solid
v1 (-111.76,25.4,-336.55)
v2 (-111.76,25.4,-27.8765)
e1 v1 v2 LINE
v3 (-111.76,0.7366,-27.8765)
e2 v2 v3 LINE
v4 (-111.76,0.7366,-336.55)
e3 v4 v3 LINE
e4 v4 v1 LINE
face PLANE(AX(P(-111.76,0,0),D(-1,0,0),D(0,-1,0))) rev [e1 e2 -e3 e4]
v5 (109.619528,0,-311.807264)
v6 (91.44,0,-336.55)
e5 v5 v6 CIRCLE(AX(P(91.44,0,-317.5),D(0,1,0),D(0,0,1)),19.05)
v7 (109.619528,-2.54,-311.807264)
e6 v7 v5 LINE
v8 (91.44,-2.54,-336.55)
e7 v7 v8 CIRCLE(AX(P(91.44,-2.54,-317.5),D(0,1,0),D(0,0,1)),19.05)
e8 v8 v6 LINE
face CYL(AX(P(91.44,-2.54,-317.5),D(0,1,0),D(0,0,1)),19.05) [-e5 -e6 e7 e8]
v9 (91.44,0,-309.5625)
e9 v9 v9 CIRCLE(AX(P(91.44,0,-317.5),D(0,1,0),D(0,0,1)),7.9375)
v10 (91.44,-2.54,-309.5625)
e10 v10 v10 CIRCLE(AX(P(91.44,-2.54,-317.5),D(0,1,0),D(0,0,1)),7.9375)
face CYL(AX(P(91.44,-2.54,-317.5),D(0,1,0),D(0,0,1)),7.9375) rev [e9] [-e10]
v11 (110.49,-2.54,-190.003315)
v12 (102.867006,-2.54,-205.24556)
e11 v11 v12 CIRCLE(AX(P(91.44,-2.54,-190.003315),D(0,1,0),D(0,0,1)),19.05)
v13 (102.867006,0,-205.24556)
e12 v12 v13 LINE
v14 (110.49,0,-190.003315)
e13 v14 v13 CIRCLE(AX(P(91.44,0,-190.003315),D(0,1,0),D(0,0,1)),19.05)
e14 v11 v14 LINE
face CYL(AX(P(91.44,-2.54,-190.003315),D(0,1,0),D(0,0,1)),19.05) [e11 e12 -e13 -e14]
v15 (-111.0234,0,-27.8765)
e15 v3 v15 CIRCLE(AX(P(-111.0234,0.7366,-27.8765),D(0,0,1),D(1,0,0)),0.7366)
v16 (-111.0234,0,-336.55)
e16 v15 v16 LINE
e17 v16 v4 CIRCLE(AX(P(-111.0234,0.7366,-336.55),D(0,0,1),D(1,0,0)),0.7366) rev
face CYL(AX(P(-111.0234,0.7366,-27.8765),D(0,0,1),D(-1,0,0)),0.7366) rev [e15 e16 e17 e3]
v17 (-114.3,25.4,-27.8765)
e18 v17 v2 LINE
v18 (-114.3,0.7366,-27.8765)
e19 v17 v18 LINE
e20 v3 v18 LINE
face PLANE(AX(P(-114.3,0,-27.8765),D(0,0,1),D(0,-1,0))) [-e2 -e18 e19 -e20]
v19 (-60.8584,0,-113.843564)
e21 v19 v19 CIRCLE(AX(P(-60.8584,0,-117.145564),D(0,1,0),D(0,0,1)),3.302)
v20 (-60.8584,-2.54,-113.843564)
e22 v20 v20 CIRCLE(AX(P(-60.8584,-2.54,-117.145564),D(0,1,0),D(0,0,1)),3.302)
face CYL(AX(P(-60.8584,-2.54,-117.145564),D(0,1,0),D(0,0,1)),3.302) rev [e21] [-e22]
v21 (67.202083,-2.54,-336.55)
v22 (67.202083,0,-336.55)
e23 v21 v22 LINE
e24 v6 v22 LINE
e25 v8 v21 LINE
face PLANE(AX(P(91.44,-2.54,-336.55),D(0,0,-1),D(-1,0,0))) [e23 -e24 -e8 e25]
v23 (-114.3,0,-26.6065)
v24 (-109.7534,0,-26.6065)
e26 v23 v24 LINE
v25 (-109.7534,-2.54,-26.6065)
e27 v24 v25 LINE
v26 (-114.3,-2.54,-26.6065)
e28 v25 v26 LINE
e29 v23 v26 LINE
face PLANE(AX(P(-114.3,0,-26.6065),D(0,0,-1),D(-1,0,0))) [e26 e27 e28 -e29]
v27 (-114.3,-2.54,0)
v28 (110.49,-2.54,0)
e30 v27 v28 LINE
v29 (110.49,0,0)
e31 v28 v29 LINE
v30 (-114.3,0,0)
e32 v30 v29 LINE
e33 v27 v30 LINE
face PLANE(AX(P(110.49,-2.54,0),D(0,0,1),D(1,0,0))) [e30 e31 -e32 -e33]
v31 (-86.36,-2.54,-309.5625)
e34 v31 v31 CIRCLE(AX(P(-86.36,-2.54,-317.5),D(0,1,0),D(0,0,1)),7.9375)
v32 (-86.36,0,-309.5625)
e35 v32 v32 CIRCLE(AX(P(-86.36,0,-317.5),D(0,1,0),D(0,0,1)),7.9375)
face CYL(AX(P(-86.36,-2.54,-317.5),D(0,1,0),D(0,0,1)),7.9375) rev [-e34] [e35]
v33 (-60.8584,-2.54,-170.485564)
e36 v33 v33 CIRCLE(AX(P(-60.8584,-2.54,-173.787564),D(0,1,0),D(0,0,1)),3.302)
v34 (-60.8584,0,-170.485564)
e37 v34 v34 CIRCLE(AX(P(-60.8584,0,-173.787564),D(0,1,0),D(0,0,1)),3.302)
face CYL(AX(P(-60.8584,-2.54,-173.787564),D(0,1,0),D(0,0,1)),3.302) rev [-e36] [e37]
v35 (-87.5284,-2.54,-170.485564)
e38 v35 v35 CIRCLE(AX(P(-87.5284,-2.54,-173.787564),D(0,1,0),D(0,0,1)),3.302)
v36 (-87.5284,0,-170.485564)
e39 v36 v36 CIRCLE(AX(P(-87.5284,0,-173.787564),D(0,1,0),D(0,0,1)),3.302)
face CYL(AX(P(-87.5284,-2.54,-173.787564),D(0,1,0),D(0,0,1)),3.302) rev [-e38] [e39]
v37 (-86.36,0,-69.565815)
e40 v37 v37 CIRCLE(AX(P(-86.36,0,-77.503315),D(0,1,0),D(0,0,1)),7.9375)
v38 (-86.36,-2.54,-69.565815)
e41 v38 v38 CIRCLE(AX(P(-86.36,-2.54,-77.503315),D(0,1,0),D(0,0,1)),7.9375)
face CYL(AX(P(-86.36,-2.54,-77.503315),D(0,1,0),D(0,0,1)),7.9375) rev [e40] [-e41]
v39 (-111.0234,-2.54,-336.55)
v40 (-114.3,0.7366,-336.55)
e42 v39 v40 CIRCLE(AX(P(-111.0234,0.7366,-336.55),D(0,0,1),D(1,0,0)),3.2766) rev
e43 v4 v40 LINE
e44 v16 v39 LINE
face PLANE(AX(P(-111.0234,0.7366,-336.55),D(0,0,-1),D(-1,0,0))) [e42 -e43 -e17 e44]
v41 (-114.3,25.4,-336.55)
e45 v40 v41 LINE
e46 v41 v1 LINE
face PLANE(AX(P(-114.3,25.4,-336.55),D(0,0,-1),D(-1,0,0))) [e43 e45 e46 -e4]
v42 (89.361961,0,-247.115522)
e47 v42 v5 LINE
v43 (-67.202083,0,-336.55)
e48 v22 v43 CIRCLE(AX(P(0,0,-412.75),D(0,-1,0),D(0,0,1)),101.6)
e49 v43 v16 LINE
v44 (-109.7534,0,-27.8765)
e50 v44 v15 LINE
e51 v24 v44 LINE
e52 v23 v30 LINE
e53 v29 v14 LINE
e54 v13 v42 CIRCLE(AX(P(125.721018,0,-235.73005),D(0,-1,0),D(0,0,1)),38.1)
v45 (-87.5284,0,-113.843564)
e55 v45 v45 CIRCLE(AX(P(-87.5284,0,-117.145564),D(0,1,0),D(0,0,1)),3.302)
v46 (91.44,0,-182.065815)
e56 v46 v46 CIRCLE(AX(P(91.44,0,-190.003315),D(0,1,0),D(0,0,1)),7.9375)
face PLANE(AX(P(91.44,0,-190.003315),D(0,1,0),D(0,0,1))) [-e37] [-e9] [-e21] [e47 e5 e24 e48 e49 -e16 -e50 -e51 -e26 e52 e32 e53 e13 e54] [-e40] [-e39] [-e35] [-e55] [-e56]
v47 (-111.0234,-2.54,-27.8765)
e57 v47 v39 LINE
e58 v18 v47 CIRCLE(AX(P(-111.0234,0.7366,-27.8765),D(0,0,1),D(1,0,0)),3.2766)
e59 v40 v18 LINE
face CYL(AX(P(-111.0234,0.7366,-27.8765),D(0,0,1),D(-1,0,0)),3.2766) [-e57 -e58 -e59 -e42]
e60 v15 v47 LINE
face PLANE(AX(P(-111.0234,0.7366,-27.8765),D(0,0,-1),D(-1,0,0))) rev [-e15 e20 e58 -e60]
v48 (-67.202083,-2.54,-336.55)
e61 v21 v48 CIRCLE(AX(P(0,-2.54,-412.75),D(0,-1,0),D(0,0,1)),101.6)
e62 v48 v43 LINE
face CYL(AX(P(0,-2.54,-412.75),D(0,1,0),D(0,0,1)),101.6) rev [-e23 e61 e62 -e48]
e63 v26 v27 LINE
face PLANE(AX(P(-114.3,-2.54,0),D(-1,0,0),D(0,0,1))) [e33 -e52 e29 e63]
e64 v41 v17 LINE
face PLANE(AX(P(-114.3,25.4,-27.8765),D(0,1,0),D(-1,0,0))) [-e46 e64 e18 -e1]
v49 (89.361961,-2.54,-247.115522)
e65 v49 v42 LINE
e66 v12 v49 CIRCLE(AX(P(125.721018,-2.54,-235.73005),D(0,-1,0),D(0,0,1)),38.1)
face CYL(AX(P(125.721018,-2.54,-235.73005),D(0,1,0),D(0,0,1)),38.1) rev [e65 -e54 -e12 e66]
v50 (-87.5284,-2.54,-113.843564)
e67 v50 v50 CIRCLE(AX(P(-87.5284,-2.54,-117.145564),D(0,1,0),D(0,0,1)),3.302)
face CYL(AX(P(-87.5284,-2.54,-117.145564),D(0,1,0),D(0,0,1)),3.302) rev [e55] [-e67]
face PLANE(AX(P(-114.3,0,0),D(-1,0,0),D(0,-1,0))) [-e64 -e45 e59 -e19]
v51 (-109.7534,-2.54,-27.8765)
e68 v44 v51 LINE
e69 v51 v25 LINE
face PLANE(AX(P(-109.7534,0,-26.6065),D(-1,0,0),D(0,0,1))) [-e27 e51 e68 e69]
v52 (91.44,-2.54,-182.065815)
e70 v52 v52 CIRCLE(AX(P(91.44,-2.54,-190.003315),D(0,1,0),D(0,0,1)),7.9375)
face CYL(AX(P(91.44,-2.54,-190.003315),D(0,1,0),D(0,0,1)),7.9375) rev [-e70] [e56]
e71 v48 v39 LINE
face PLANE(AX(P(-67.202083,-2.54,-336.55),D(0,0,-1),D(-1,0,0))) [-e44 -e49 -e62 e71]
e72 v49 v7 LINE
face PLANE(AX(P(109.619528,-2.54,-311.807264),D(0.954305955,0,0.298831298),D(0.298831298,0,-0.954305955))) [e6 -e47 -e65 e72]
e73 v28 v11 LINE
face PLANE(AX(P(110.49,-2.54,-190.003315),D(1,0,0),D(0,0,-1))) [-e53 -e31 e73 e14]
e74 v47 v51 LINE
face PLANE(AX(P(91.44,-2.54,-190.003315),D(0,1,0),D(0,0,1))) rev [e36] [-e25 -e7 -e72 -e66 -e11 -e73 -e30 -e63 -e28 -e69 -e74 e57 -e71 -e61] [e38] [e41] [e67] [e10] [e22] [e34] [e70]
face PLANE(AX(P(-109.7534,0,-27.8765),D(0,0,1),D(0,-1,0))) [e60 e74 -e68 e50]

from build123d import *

# Parameters (mm, degrees)
SKETCH1_R                     = 7.9375
SKETCH1_R_2                   = 3.302
BASE_FLANGE1_DEPTH            = 2.54
EDGE_FLANGE1_STRIP_W          = 11.6332
EDGE_FLANGE1_STRIP_H          = 2.54
EDGE_FLANGE1_STRIP_CUT_DEPTH  = 308.6735
EDGE_FLANGE1_RELIEF_W         = 12.9032
EDGE_FLANGE1_RELIEF_H         = 1.27
EDGE_FLANGE1_RELIEF_CUT_DEPTH = 2.54
EDGE_FLANGE1_DEPTH            = 308.6735


# Sheet-metal steps are written as plain solids
with BuildPart() as part:
    # Sketch1 → Base-Flange1 (new body)
    with BuildSketch(Plane(origin=(0, 0, 0), x_dir=(1, 0, 0), z_dir=(0, 1, 0))):
        with BuildLine():
            Line((109.619528436, 311.807263764), (89.361961148, 247.115522342))
            ThreePointArc((89.361961148, 247.115522342), (89.460566801, 224.034337943), (102.867006006, 205.245559798))
            ThreePointArc((102.867006006, 205.245559798), (108.478001121, 198.524407286), (110.49, 190.003314763))
            Line((110.49, 190.003314763), (110.49, 0))
            Line((110.49, 0), (-114.3, 0))
            Line((-114.3, 0), (-114.3, 336.55))
            Line((-114.3, 336.55), (-67.202083301, 336.55))
            ThreePointArc((-67.202083301, 336.55), (0, 311.15), (67.202083301, 336.55))
            Line((67.202083301, 336.55), (91.44, 336.55))
            ThreePointArc((91.44, 336.55), (106.791695758, 328.779536221), (109.619528436, 311.807263764))
        make_face()
        with Locations(Location((-86.36, 317.5, 0), (0, 0, 270))):
            Circle(SKETCH1_R, mode=Mode.SUBTRACT)
        with Locations(Location((91.44, 317.5, 0), (0, 0, 270))):
            Circle(SKETCH1_R, mode=Mode.SUBTRACT)
        with Locations(Location((91.44, 190.003314763, 0), (0, 0, 270))):
            Circle(SKETCH1_R, mode=Mode.SUBTRACT)
        with Locations(Location((-86.36, 77.503314763, 0), (0, 0, 270))):
            Circle(SKETCH1_R, mode=Mode.SUBTRACT)
        with Locations(Location((-60.8584, 173.787563647, 0), (0, 0, 270))):
            Circle(SKETCH1_R_2, mode=Mode.SUBTRACT)
        with Locations(Location((-87.5284, 173.787563647, 0), (0, 0, 270))):
            Circle(SKETCH1_R_2, mode=Mode.SUBTRACT)
        with Locations(Location((-60.8584, 117.145563647, 0), (0, 0, 270))):
            Circle(SKETCH1_R_2, mode=Mode.SUBTRACT)
        with Locations(Location((-87.5284, 117.145563647, 0), (0, 0, 270))):
            Circle(SKETCH1_R_2, mode=Mode.SUBTRACT)
    extrude(amount=-BASE_FLANGE1_DEPTH)

    # Edge-Flange1 strip (across the edge) → Edge-Flange1 strip cut (cut)
    with BuildSketch(Plane(origin=(-114.3, 0, -336.55), x_dir=(1, 0, 0), z_dir=(0, 0, 1))):
        with Locations((-2.54, -1.27)):
            Rectangle(EDGE_FLANGE1_STRIP_W, EDGE_FLANGE1_STRIP_H)
    extrude(amount=EDGE_FLANGE1_STRIP_CUT_DEPTH, mode=Mode.SUBTRACT)

    # Edge-Flange1 relief (on the sheet) → Edge-Flange1 relief cut (cut)
    with BuildSketch(Plane(origin=(-111.0234, 0, -336.55), x_dir=(1, 0, 0), z_dir=(0, 1, 0))):
        with Locations((-5.1816, -309.3085)):
            Rectangle(EDGE_FLANGE1_RELIEF_W, EDGE_FLANGE1_RELIEF_H)
    extrude(amount=-EDGE_FLANGE1_RELIEF_CUT_DEPTH, mode=Mode.SUBTRACT)

    # Edge-Flange1 section (across the edge) → Edge-Flange1 (add)
    with BuildSketch(Plane(origin=(-114.3, 0, -336.55), x_dir=(1, 0, 0), z_dir=(0, 0, 1))):
        with BuildLine():
            Line((0, 0.7366), (0, 25.4))
            Line((0, 25.4), (2.54, 25.4))
            Line((2.54, 25.4), (2.54, 0.7366))
            ThreePointArc((2.54, 0.7366), (2.755745145, 0.215745145), (3.2766, 0))
            Line((3.2766, 0), (3.2766, -2.54))
            ThreePointArc((3.2766, -2.54), (0.959693921, -1.580306079), (0, 0.7366))
        make_face()
    extrude(amount=EDGE_FLANGE1_DEPTH)


solid = part.part
